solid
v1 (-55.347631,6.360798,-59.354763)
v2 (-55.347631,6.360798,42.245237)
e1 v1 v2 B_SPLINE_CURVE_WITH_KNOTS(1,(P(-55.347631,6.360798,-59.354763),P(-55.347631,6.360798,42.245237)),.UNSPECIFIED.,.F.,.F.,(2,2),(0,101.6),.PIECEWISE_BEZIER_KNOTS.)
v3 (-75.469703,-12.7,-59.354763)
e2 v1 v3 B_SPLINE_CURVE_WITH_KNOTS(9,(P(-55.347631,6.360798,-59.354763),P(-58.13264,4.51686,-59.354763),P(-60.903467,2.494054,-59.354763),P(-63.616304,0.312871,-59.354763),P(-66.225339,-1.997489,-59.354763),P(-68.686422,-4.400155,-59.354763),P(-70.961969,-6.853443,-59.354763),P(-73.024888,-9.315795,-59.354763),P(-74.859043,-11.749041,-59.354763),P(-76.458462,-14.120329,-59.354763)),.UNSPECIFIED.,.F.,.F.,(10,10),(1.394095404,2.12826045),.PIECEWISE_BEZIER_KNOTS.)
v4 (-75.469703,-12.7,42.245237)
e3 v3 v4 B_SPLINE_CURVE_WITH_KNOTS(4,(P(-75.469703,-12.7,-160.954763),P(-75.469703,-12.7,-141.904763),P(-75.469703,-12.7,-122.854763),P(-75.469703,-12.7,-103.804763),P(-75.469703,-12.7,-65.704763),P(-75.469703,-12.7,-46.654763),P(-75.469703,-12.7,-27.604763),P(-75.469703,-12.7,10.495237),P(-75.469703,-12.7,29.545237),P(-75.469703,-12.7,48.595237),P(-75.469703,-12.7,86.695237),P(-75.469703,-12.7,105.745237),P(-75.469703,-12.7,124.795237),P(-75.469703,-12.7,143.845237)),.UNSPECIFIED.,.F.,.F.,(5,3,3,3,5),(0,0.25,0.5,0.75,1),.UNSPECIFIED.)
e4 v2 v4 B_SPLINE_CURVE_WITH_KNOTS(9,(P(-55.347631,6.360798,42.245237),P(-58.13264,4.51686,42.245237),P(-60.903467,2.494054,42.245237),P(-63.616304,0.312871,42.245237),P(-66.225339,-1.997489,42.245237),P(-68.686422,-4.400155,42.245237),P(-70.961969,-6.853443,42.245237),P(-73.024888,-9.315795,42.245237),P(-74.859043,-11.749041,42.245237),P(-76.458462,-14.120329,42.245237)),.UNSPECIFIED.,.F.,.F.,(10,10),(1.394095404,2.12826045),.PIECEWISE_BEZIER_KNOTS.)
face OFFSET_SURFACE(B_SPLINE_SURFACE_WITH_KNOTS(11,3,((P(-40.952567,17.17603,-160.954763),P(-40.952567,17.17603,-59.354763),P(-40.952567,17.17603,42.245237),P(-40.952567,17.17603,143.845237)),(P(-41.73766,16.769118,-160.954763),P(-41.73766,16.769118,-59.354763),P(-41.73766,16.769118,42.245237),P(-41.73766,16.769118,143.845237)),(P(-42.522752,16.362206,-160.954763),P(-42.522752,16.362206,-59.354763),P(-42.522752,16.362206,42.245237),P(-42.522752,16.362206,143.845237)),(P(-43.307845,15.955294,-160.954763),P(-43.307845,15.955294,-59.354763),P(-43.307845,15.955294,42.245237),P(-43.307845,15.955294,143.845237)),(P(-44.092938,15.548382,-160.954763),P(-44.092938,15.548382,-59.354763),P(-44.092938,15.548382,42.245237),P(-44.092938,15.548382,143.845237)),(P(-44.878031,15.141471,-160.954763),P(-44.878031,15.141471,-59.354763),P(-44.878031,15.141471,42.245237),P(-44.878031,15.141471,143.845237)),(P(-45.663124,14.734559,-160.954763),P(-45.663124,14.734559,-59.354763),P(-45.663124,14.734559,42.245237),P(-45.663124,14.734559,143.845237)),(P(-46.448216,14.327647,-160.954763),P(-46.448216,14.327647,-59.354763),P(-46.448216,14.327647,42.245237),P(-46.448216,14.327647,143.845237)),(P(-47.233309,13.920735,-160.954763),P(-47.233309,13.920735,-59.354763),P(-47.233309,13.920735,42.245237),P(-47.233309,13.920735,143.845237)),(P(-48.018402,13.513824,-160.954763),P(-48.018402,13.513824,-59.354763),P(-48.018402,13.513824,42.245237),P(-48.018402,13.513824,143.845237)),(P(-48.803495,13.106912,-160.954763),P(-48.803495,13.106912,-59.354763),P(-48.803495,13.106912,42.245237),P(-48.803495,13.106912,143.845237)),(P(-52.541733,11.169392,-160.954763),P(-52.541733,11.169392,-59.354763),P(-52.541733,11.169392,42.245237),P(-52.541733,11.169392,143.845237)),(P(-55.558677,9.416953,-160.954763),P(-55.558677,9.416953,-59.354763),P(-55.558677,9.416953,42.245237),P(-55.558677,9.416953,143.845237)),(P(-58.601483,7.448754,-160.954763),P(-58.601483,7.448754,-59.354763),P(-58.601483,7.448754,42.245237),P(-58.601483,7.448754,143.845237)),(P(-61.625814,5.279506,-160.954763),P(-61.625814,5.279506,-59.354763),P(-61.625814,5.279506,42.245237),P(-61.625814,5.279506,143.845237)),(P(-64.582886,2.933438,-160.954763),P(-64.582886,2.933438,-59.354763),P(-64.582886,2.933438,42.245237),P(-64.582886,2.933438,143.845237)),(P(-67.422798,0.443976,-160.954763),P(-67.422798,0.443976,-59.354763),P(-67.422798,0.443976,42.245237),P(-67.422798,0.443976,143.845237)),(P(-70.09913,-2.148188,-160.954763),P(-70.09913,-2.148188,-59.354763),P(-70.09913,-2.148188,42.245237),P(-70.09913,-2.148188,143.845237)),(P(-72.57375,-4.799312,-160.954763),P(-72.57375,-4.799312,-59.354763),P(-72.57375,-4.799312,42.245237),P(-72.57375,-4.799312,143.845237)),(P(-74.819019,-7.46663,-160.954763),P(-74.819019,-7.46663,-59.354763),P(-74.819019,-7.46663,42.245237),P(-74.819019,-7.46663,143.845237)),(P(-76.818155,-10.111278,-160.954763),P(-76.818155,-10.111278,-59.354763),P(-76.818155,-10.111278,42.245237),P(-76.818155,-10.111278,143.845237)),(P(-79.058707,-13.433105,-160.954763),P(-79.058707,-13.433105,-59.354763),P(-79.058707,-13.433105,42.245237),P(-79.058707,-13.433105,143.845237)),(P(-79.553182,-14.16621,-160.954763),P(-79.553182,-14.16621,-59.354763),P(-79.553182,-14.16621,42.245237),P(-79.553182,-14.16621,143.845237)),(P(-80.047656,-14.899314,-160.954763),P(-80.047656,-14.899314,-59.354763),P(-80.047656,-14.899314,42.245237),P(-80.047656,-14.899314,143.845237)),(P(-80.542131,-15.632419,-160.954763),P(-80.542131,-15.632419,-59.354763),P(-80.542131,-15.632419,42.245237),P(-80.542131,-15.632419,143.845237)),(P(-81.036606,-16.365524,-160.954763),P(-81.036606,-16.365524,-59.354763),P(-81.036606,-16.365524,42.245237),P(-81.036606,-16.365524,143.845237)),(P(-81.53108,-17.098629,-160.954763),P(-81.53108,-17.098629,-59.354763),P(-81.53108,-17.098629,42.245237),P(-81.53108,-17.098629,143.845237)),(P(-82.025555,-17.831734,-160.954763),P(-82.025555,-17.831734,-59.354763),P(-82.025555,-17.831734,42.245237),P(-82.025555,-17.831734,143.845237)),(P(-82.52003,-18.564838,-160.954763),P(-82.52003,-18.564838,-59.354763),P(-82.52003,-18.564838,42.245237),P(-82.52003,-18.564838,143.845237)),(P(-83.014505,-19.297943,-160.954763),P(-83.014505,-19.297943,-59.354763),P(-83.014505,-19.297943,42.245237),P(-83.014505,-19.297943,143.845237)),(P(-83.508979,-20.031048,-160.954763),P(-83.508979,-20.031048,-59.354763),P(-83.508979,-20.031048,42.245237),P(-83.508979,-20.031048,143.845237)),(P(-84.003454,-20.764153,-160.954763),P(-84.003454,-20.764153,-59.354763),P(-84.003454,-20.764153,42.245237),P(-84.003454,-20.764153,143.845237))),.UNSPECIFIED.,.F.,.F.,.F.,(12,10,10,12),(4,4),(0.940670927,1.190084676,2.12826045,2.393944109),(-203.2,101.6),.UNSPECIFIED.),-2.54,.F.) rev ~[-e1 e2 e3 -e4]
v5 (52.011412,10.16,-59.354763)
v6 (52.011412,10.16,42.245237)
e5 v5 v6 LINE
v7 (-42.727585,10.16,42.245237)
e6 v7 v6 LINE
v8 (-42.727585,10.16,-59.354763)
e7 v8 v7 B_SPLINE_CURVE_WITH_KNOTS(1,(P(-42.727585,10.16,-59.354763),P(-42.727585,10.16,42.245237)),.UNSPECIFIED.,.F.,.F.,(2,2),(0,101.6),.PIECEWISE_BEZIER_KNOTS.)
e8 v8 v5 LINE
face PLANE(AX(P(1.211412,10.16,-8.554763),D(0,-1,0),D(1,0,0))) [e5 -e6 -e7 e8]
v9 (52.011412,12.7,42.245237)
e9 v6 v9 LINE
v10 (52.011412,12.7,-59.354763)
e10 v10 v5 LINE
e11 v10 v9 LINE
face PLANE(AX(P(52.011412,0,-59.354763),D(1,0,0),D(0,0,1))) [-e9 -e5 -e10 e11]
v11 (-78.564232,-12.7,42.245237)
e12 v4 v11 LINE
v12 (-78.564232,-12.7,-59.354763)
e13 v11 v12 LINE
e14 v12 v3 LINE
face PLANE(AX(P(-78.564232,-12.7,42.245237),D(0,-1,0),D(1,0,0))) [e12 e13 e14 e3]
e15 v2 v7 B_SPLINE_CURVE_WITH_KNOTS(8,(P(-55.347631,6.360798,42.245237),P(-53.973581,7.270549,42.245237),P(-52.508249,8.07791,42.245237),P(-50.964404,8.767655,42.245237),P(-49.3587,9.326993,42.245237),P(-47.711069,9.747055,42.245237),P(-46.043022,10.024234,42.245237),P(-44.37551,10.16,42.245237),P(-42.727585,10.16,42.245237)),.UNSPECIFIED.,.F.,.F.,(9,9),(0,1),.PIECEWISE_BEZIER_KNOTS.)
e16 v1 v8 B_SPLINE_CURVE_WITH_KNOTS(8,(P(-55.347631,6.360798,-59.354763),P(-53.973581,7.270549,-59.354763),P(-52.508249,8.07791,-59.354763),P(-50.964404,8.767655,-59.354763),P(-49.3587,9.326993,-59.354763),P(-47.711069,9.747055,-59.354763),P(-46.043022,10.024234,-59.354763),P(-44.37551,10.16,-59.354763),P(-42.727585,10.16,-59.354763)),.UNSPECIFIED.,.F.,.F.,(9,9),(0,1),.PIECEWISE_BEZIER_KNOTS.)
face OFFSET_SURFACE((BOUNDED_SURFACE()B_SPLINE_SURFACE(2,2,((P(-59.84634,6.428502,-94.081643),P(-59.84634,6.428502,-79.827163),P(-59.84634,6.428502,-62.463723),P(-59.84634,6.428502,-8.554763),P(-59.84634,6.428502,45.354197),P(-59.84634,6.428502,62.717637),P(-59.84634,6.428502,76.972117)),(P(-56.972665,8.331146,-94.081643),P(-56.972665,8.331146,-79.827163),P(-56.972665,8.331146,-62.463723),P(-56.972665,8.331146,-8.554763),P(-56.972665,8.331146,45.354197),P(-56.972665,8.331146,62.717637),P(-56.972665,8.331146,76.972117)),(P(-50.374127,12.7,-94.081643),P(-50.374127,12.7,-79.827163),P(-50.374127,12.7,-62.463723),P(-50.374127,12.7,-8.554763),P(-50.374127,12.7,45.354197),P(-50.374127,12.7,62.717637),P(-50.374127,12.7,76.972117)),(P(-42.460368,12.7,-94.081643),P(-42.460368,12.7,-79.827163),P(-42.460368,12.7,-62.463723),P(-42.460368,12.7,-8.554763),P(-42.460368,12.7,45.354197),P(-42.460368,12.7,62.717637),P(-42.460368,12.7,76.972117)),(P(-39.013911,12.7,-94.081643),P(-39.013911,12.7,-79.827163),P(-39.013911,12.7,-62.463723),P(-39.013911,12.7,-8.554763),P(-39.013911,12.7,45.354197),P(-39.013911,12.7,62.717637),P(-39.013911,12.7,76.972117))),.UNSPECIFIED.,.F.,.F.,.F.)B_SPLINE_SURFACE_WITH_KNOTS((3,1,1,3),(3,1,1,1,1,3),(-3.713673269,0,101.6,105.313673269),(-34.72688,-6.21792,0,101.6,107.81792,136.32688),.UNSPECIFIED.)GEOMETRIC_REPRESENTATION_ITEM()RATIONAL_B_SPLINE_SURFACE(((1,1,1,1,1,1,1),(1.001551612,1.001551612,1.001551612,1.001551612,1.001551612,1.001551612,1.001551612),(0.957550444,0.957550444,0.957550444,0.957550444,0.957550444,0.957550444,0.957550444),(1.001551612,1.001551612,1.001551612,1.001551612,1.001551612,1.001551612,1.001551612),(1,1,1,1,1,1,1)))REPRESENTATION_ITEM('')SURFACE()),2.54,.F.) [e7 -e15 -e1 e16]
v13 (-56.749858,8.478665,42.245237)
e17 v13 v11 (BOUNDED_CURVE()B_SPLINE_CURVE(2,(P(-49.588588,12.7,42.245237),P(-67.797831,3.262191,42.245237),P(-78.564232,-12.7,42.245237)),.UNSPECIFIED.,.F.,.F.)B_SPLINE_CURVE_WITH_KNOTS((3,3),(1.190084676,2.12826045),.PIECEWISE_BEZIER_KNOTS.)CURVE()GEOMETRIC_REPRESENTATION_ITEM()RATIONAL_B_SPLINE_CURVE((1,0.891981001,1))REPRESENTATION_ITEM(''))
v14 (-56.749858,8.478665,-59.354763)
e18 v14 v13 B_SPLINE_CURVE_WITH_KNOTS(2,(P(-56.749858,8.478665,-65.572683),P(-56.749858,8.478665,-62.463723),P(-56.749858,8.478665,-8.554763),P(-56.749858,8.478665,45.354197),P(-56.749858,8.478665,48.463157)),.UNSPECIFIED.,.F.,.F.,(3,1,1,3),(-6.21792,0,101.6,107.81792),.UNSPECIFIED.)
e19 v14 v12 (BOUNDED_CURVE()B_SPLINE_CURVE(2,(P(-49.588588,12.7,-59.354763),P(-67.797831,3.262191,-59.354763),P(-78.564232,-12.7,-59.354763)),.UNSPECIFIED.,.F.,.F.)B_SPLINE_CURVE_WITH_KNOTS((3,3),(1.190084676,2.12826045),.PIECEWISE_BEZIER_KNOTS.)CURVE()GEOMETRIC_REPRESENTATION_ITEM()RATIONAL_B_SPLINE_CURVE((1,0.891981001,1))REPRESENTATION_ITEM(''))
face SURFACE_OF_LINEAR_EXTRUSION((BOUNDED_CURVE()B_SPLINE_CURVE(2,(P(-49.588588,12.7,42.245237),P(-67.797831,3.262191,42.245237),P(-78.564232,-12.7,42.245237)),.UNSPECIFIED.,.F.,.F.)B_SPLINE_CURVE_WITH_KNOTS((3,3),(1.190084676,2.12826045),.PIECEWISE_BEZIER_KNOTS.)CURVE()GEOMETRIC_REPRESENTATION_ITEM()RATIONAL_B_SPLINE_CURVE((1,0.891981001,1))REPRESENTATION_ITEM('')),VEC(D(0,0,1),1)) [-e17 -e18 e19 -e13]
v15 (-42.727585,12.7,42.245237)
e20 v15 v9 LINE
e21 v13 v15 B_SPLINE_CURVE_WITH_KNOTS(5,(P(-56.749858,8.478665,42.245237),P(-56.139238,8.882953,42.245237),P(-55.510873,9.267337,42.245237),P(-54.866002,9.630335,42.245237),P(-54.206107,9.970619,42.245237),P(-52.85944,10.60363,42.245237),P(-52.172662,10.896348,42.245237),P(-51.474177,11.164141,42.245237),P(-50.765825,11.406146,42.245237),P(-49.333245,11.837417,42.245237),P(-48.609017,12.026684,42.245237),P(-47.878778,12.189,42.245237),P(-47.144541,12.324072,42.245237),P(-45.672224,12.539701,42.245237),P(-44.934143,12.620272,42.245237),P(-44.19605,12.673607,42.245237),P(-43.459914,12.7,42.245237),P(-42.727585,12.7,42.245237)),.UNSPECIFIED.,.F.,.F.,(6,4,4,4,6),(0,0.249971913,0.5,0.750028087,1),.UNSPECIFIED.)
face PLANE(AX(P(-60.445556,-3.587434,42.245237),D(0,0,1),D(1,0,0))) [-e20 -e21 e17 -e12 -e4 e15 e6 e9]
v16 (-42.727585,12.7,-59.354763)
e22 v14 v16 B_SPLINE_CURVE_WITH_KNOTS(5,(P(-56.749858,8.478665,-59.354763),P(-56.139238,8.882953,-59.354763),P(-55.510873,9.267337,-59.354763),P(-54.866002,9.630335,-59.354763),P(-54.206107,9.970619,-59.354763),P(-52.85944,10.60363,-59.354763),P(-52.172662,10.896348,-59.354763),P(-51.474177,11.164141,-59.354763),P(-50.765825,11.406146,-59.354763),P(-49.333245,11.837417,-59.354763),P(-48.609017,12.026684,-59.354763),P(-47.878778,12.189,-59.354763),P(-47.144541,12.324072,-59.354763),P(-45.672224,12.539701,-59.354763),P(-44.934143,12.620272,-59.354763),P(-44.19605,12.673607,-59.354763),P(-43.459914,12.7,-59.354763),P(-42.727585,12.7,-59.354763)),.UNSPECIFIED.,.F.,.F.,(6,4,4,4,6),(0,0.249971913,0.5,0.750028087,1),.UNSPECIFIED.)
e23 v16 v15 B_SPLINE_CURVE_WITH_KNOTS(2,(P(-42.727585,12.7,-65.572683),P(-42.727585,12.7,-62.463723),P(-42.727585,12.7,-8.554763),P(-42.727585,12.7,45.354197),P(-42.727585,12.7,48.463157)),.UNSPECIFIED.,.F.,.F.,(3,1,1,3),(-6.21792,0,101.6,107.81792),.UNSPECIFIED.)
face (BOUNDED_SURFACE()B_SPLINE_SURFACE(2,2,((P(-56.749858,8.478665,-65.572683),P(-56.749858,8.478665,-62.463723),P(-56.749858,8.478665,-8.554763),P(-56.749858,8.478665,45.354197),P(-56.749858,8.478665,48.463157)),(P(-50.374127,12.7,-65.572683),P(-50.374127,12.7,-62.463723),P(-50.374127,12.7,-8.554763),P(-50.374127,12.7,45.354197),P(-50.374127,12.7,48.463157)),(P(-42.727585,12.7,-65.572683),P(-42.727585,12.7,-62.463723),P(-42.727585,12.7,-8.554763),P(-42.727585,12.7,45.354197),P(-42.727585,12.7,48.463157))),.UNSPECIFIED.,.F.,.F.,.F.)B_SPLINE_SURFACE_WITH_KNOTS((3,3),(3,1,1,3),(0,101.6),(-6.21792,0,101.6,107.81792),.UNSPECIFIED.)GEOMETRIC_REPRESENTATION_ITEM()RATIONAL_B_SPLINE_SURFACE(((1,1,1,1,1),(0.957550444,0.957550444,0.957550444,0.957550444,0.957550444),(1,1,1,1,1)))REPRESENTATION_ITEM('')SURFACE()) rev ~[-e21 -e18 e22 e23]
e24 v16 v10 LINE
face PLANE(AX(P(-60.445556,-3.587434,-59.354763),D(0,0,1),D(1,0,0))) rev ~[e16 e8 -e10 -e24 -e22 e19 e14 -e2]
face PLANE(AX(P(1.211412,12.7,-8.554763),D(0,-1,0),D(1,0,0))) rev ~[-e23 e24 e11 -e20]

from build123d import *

# Parameters (mm, degrees)
F0_W     = 101.6
F0_H     = 101.6
F1_DEPTH = 12.7
F3_DEPTH = 101.6
F4_R     = 25.4
F5_T     = -2.54


# Not quite as in the source:
# - a feature of the source that left no trace in its solid (it failed there, or was rolled back) is left out


with BuildPart() as f1:
    # F0 (on Front) → F1 (new body, symmetric)
    with BuildSketch(Plane.XZ):
        with Locations((1.211412394, -8.554763478)):
            Rectangle(F0_W, F0_H)
    extrude(amount=F1_DEPTH, both=True)

    # F2 (on face) → F3 (join)
    with BuildSketch(Plane.XY.offset(42.245236522)):
        with BuildLine():
            Line((-49.588587606, -12.7), (-49.588587606, 12.7))
            add(Edge.make_bspline(
                [(-49.588587606, 12.7), (-67.7978310293, 3.2621913661), (-78.5642321364, -12.7)],
                knots=[1.1900846756, 1.1900846756, 1.1900846756, 2.1282604502, 2.1282604502, 2.1282604502], degree=2, weights=[1, 0.8919810006, 1]))
            Line((-78.5642321364, -12.7), (-49.588587606, -12.7))
        make_face()
    extrude(amount=-F3_DEPTH)

    # F4
    f4_edges = [f1.edges().sort_by_distance(p)[0] for p in [
        (-49.588588, 12.7, -8.554763),
    ]]
    fillet(f4_edges, radius=F4_R)

    # F5
    f5_openings = [f1.faces().sort_by_distance(p)[0] for p in [
        (-7.437576, -0.524073, 42.245237),
        (-13.27641, -12.7, -8.554763),
        (52.011412, 0, -8.554763),
        (-7.437576, -0.524073, -59.354763),
    ]]
    offset(amount=F5_T, openings=f5_openings)


solid = f1.part
